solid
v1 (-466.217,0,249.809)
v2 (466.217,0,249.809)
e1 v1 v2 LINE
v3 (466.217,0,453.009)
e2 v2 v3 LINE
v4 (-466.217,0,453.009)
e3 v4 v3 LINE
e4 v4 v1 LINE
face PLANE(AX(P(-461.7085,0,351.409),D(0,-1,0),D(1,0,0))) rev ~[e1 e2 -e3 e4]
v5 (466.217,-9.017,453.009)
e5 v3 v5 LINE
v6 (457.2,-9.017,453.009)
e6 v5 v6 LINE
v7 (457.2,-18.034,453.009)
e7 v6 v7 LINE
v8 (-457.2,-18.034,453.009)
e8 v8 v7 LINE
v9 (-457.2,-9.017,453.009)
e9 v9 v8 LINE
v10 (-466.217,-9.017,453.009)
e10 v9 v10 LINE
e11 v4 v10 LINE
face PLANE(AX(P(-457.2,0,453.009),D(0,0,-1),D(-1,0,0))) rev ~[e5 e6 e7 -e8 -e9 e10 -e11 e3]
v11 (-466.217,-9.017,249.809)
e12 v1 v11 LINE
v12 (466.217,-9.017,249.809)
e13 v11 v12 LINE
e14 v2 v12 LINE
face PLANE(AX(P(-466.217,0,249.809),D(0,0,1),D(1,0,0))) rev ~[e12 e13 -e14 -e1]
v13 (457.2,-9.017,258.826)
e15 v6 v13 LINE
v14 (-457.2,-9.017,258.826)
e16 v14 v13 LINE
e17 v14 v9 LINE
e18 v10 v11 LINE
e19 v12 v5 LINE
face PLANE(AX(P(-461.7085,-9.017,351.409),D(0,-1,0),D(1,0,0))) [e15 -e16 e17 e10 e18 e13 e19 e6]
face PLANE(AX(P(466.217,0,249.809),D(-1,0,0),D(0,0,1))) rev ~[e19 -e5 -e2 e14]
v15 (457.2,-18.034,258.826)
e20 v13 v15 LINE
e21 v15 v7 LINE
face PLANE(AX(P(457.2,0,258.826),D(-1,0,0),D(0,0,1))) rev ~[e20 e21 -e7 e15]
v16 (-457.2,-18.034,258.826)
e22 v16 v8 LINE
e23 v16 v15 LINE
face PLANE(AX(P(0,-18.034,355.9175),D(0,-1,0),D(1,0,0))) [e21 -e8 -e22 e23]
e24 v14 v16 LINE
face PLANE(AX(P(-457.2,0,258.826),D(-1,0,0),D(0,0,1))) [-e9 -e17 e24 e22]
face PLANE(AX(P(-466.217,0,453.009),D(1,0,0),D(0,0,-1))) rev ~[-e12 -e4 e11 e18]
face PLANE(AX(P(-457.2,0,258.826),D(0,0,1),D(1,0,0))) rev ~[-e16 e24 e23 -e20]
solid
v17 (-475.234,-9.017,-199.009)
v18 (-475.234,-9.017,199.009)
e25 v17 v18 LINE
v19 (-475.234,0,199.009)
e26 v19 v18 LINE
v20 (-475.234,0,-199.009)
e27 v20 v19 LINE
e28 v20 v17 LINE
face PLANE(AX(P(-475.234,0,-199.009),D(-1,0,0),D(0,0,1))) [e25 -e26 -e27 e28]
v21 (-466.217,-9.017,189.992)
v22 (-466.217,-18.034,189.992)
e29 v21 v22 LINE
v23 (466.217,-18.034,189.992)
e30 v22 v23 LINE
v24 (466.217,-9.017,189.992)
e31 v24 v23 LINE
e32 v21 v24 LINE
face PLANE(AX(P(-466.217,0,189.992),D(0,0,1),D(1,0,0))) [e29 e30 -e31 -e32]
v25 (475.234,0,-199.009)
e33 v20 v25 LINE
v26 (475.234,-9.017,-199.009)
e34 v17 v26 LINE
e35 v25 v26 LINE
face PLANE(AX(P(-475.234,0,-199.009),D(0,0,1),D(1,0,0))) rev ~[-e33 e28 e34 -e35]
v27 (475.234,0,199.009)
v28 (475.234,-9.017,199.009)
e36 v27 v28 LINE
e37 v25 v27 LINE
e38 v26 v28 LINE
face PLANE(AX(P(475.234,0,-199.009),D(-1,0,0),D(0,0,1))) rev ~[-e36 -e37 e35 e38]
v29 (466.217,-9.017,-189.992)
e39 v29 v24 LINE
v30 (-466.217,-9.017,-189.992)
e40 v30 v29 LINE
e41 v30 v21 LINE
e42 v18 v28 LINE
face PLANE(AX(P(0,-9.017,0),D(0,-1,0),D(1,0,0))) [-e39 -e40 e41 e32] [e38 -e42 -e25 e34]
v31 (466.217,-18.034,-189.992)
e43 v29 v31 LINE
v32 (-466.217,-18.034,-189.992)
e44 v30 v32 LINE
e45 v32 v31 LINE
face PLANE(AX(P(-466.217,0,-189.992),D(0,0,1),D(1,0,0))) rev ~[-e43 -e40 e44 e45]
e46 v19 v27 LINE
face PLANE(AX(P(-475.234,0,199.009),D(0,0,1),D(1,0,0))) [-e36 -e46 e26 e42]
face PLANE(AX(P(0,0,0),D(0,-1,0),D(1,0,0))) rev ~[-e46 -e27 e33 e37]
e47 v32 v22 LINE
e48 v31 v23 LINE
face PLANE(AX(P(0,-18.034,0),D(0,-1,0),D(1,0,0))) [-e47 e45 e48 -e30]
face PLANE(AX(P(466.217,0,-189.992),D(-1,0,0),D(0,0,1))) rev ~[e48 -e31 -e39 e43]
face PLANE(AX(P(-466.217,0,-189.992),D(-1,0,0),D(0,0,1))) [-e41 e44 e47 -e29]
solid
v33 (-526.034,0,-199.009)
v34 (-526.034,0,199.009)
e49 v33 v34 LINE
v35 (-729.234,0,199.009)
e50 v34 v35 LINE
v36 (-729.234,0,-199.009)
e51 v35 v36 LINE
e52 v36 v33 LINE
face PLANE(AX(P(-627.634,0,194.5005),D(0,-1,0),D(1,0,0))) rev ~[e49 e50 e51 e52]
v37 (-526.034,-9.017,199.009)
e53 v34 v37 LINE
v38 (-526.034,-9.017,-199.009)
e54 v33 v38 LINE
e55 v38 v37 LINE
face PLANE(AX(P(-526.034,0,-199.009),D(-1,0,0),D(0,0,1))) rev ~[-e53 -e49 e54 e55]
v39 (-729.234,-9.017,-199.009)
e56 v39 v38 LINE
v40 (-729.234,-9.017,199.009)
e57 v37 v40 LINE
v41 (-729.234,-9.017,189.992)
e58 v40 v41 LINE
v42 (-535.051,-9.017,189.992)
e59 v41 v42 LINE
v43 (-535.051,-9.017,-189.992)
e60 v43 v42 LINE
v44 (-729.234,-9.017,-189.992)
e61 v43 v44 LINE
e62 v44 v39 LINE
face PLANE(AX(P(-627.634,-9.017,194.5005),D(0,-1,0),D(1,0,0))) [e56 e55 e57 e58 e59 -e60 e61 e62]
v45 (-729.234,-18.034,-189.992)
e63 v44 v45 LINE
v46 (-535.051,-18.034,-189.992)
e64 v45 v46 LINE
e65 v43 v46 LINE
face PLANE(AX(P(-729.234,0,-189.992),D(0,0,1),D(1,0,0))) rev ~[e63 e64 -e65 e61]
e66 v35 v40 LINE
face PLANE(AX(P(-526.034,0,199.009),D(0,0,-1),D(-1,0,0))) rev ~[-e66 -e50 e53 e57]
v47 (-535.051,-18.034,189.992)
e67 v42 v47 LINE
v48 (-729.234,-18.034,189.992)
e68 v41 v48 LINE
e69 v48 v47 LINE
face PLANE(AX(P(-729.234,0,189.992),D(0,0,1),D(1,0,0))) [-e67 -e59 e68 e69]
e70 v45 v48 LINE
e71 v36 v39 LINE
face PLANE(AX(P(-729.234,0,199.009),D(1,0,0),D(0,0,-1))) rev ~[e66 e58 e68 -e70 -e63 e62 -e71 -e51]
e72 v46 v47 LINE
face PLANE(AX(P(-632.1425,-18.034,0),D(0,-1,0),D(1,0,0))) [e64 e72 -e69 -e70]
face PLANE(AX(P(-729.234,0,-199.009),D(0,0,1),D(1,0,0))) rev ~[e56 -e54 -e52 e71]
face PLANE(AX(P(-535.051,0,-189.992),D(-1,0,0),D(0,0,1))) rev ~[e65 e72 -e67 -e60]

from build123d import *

# Parameters (mm, degrees)
F1_W     = 914.4
F1_H     = 194.183
F2_DEPTH = 18.034
F1_W_2   = 932.434
F1_H_2   = 379.984
F1_W_3   = 194.183
F1_H_3   = 9.017
F3_DEPTH = 9.017
F1_W_4   = 950.468
F1_H_4   = 398.018
F1_W_5   = 9.017


# Not quite as in the source:
# - a variable given as a bare number and used for a length is read in inches; the dataset says mm whatever the document's units were


with BuildPart() as f2:
    # F1 (on Front) → F2 (new body)
    with BuildSketch(Plane.XZ):
        with Locations((0, 355.9175)):
            Rectangle(F1_W, F1_H)
    extrude(amount=F2_DEPTH)

    # F1 (on Front) → F3 (join)
    with BuildSketch(Plane.XZ):
        Polygon((-466.217, 249.809), (-457.2, 249.809), (-457.2, 258.826), (-457.2, 453.009), (-466.217, 453.009), align=None)
        Polygon((457.2, 249.809), (466.217, 249.809), (466.217, 453.009), (457.2, 453.009), (457.2, 258.826), align=None)
        with Locations((0, 254.3175)):
            Rectangle(F1_W, F1_H_3)
    extrude(amount=F3_DEPTH)


with BuildPart() as f2b:
    # F1 (on Front) → F2, piece 2 (new body)
    with BuildSketch(Plane.XZ):
        Rectangle(F1_W_2, F1_H_2)
    extrude(amount=F2_DEPTH)

    # F1 (on Front) → F3, piece 2 (join)
    with BuildSketch(Plane.XZ):
        Rectangle(F1_W_4, F1_H_4)
        Rectangle(F1_W_2, F1_H_2, mode=Mode.SUBTRACT)
    extrude(amount=F3_DEPTH)


with BuildPart() as f2c:
    # F1 (on Front) → F2, piece 3 (new body)
    with BuildSketch(Plane.XZ):
        with Locations((-632.1425, 0)):
            Rectangle(F1_W_3, F1_H_2)
    extrude(amount=F2_DEPTH)

    # F1 (on Front) → F3, piece 3 (join)
    with BuildSketch(Plane.XZ):
        Polygon((-526.034, 189.992), (-526.034, 199.009), (-729.234, 199.009), (-729.234, 189.992), (-535.051, 189.992), align=None)
        with Locations((-530.5425, 0)):
            Rectangle(F1_W_5, F1_H_2)
        Polygon((-526.034, -199.009), (-526.034, -189.992), (-535.051, -189.992), (-729.234, -189.992), (-729.234, -199.009), align=None)
    extrude(amount=F3_DEPTH)


solid = Compound([f2.part, f2b.part, f2c.part])
